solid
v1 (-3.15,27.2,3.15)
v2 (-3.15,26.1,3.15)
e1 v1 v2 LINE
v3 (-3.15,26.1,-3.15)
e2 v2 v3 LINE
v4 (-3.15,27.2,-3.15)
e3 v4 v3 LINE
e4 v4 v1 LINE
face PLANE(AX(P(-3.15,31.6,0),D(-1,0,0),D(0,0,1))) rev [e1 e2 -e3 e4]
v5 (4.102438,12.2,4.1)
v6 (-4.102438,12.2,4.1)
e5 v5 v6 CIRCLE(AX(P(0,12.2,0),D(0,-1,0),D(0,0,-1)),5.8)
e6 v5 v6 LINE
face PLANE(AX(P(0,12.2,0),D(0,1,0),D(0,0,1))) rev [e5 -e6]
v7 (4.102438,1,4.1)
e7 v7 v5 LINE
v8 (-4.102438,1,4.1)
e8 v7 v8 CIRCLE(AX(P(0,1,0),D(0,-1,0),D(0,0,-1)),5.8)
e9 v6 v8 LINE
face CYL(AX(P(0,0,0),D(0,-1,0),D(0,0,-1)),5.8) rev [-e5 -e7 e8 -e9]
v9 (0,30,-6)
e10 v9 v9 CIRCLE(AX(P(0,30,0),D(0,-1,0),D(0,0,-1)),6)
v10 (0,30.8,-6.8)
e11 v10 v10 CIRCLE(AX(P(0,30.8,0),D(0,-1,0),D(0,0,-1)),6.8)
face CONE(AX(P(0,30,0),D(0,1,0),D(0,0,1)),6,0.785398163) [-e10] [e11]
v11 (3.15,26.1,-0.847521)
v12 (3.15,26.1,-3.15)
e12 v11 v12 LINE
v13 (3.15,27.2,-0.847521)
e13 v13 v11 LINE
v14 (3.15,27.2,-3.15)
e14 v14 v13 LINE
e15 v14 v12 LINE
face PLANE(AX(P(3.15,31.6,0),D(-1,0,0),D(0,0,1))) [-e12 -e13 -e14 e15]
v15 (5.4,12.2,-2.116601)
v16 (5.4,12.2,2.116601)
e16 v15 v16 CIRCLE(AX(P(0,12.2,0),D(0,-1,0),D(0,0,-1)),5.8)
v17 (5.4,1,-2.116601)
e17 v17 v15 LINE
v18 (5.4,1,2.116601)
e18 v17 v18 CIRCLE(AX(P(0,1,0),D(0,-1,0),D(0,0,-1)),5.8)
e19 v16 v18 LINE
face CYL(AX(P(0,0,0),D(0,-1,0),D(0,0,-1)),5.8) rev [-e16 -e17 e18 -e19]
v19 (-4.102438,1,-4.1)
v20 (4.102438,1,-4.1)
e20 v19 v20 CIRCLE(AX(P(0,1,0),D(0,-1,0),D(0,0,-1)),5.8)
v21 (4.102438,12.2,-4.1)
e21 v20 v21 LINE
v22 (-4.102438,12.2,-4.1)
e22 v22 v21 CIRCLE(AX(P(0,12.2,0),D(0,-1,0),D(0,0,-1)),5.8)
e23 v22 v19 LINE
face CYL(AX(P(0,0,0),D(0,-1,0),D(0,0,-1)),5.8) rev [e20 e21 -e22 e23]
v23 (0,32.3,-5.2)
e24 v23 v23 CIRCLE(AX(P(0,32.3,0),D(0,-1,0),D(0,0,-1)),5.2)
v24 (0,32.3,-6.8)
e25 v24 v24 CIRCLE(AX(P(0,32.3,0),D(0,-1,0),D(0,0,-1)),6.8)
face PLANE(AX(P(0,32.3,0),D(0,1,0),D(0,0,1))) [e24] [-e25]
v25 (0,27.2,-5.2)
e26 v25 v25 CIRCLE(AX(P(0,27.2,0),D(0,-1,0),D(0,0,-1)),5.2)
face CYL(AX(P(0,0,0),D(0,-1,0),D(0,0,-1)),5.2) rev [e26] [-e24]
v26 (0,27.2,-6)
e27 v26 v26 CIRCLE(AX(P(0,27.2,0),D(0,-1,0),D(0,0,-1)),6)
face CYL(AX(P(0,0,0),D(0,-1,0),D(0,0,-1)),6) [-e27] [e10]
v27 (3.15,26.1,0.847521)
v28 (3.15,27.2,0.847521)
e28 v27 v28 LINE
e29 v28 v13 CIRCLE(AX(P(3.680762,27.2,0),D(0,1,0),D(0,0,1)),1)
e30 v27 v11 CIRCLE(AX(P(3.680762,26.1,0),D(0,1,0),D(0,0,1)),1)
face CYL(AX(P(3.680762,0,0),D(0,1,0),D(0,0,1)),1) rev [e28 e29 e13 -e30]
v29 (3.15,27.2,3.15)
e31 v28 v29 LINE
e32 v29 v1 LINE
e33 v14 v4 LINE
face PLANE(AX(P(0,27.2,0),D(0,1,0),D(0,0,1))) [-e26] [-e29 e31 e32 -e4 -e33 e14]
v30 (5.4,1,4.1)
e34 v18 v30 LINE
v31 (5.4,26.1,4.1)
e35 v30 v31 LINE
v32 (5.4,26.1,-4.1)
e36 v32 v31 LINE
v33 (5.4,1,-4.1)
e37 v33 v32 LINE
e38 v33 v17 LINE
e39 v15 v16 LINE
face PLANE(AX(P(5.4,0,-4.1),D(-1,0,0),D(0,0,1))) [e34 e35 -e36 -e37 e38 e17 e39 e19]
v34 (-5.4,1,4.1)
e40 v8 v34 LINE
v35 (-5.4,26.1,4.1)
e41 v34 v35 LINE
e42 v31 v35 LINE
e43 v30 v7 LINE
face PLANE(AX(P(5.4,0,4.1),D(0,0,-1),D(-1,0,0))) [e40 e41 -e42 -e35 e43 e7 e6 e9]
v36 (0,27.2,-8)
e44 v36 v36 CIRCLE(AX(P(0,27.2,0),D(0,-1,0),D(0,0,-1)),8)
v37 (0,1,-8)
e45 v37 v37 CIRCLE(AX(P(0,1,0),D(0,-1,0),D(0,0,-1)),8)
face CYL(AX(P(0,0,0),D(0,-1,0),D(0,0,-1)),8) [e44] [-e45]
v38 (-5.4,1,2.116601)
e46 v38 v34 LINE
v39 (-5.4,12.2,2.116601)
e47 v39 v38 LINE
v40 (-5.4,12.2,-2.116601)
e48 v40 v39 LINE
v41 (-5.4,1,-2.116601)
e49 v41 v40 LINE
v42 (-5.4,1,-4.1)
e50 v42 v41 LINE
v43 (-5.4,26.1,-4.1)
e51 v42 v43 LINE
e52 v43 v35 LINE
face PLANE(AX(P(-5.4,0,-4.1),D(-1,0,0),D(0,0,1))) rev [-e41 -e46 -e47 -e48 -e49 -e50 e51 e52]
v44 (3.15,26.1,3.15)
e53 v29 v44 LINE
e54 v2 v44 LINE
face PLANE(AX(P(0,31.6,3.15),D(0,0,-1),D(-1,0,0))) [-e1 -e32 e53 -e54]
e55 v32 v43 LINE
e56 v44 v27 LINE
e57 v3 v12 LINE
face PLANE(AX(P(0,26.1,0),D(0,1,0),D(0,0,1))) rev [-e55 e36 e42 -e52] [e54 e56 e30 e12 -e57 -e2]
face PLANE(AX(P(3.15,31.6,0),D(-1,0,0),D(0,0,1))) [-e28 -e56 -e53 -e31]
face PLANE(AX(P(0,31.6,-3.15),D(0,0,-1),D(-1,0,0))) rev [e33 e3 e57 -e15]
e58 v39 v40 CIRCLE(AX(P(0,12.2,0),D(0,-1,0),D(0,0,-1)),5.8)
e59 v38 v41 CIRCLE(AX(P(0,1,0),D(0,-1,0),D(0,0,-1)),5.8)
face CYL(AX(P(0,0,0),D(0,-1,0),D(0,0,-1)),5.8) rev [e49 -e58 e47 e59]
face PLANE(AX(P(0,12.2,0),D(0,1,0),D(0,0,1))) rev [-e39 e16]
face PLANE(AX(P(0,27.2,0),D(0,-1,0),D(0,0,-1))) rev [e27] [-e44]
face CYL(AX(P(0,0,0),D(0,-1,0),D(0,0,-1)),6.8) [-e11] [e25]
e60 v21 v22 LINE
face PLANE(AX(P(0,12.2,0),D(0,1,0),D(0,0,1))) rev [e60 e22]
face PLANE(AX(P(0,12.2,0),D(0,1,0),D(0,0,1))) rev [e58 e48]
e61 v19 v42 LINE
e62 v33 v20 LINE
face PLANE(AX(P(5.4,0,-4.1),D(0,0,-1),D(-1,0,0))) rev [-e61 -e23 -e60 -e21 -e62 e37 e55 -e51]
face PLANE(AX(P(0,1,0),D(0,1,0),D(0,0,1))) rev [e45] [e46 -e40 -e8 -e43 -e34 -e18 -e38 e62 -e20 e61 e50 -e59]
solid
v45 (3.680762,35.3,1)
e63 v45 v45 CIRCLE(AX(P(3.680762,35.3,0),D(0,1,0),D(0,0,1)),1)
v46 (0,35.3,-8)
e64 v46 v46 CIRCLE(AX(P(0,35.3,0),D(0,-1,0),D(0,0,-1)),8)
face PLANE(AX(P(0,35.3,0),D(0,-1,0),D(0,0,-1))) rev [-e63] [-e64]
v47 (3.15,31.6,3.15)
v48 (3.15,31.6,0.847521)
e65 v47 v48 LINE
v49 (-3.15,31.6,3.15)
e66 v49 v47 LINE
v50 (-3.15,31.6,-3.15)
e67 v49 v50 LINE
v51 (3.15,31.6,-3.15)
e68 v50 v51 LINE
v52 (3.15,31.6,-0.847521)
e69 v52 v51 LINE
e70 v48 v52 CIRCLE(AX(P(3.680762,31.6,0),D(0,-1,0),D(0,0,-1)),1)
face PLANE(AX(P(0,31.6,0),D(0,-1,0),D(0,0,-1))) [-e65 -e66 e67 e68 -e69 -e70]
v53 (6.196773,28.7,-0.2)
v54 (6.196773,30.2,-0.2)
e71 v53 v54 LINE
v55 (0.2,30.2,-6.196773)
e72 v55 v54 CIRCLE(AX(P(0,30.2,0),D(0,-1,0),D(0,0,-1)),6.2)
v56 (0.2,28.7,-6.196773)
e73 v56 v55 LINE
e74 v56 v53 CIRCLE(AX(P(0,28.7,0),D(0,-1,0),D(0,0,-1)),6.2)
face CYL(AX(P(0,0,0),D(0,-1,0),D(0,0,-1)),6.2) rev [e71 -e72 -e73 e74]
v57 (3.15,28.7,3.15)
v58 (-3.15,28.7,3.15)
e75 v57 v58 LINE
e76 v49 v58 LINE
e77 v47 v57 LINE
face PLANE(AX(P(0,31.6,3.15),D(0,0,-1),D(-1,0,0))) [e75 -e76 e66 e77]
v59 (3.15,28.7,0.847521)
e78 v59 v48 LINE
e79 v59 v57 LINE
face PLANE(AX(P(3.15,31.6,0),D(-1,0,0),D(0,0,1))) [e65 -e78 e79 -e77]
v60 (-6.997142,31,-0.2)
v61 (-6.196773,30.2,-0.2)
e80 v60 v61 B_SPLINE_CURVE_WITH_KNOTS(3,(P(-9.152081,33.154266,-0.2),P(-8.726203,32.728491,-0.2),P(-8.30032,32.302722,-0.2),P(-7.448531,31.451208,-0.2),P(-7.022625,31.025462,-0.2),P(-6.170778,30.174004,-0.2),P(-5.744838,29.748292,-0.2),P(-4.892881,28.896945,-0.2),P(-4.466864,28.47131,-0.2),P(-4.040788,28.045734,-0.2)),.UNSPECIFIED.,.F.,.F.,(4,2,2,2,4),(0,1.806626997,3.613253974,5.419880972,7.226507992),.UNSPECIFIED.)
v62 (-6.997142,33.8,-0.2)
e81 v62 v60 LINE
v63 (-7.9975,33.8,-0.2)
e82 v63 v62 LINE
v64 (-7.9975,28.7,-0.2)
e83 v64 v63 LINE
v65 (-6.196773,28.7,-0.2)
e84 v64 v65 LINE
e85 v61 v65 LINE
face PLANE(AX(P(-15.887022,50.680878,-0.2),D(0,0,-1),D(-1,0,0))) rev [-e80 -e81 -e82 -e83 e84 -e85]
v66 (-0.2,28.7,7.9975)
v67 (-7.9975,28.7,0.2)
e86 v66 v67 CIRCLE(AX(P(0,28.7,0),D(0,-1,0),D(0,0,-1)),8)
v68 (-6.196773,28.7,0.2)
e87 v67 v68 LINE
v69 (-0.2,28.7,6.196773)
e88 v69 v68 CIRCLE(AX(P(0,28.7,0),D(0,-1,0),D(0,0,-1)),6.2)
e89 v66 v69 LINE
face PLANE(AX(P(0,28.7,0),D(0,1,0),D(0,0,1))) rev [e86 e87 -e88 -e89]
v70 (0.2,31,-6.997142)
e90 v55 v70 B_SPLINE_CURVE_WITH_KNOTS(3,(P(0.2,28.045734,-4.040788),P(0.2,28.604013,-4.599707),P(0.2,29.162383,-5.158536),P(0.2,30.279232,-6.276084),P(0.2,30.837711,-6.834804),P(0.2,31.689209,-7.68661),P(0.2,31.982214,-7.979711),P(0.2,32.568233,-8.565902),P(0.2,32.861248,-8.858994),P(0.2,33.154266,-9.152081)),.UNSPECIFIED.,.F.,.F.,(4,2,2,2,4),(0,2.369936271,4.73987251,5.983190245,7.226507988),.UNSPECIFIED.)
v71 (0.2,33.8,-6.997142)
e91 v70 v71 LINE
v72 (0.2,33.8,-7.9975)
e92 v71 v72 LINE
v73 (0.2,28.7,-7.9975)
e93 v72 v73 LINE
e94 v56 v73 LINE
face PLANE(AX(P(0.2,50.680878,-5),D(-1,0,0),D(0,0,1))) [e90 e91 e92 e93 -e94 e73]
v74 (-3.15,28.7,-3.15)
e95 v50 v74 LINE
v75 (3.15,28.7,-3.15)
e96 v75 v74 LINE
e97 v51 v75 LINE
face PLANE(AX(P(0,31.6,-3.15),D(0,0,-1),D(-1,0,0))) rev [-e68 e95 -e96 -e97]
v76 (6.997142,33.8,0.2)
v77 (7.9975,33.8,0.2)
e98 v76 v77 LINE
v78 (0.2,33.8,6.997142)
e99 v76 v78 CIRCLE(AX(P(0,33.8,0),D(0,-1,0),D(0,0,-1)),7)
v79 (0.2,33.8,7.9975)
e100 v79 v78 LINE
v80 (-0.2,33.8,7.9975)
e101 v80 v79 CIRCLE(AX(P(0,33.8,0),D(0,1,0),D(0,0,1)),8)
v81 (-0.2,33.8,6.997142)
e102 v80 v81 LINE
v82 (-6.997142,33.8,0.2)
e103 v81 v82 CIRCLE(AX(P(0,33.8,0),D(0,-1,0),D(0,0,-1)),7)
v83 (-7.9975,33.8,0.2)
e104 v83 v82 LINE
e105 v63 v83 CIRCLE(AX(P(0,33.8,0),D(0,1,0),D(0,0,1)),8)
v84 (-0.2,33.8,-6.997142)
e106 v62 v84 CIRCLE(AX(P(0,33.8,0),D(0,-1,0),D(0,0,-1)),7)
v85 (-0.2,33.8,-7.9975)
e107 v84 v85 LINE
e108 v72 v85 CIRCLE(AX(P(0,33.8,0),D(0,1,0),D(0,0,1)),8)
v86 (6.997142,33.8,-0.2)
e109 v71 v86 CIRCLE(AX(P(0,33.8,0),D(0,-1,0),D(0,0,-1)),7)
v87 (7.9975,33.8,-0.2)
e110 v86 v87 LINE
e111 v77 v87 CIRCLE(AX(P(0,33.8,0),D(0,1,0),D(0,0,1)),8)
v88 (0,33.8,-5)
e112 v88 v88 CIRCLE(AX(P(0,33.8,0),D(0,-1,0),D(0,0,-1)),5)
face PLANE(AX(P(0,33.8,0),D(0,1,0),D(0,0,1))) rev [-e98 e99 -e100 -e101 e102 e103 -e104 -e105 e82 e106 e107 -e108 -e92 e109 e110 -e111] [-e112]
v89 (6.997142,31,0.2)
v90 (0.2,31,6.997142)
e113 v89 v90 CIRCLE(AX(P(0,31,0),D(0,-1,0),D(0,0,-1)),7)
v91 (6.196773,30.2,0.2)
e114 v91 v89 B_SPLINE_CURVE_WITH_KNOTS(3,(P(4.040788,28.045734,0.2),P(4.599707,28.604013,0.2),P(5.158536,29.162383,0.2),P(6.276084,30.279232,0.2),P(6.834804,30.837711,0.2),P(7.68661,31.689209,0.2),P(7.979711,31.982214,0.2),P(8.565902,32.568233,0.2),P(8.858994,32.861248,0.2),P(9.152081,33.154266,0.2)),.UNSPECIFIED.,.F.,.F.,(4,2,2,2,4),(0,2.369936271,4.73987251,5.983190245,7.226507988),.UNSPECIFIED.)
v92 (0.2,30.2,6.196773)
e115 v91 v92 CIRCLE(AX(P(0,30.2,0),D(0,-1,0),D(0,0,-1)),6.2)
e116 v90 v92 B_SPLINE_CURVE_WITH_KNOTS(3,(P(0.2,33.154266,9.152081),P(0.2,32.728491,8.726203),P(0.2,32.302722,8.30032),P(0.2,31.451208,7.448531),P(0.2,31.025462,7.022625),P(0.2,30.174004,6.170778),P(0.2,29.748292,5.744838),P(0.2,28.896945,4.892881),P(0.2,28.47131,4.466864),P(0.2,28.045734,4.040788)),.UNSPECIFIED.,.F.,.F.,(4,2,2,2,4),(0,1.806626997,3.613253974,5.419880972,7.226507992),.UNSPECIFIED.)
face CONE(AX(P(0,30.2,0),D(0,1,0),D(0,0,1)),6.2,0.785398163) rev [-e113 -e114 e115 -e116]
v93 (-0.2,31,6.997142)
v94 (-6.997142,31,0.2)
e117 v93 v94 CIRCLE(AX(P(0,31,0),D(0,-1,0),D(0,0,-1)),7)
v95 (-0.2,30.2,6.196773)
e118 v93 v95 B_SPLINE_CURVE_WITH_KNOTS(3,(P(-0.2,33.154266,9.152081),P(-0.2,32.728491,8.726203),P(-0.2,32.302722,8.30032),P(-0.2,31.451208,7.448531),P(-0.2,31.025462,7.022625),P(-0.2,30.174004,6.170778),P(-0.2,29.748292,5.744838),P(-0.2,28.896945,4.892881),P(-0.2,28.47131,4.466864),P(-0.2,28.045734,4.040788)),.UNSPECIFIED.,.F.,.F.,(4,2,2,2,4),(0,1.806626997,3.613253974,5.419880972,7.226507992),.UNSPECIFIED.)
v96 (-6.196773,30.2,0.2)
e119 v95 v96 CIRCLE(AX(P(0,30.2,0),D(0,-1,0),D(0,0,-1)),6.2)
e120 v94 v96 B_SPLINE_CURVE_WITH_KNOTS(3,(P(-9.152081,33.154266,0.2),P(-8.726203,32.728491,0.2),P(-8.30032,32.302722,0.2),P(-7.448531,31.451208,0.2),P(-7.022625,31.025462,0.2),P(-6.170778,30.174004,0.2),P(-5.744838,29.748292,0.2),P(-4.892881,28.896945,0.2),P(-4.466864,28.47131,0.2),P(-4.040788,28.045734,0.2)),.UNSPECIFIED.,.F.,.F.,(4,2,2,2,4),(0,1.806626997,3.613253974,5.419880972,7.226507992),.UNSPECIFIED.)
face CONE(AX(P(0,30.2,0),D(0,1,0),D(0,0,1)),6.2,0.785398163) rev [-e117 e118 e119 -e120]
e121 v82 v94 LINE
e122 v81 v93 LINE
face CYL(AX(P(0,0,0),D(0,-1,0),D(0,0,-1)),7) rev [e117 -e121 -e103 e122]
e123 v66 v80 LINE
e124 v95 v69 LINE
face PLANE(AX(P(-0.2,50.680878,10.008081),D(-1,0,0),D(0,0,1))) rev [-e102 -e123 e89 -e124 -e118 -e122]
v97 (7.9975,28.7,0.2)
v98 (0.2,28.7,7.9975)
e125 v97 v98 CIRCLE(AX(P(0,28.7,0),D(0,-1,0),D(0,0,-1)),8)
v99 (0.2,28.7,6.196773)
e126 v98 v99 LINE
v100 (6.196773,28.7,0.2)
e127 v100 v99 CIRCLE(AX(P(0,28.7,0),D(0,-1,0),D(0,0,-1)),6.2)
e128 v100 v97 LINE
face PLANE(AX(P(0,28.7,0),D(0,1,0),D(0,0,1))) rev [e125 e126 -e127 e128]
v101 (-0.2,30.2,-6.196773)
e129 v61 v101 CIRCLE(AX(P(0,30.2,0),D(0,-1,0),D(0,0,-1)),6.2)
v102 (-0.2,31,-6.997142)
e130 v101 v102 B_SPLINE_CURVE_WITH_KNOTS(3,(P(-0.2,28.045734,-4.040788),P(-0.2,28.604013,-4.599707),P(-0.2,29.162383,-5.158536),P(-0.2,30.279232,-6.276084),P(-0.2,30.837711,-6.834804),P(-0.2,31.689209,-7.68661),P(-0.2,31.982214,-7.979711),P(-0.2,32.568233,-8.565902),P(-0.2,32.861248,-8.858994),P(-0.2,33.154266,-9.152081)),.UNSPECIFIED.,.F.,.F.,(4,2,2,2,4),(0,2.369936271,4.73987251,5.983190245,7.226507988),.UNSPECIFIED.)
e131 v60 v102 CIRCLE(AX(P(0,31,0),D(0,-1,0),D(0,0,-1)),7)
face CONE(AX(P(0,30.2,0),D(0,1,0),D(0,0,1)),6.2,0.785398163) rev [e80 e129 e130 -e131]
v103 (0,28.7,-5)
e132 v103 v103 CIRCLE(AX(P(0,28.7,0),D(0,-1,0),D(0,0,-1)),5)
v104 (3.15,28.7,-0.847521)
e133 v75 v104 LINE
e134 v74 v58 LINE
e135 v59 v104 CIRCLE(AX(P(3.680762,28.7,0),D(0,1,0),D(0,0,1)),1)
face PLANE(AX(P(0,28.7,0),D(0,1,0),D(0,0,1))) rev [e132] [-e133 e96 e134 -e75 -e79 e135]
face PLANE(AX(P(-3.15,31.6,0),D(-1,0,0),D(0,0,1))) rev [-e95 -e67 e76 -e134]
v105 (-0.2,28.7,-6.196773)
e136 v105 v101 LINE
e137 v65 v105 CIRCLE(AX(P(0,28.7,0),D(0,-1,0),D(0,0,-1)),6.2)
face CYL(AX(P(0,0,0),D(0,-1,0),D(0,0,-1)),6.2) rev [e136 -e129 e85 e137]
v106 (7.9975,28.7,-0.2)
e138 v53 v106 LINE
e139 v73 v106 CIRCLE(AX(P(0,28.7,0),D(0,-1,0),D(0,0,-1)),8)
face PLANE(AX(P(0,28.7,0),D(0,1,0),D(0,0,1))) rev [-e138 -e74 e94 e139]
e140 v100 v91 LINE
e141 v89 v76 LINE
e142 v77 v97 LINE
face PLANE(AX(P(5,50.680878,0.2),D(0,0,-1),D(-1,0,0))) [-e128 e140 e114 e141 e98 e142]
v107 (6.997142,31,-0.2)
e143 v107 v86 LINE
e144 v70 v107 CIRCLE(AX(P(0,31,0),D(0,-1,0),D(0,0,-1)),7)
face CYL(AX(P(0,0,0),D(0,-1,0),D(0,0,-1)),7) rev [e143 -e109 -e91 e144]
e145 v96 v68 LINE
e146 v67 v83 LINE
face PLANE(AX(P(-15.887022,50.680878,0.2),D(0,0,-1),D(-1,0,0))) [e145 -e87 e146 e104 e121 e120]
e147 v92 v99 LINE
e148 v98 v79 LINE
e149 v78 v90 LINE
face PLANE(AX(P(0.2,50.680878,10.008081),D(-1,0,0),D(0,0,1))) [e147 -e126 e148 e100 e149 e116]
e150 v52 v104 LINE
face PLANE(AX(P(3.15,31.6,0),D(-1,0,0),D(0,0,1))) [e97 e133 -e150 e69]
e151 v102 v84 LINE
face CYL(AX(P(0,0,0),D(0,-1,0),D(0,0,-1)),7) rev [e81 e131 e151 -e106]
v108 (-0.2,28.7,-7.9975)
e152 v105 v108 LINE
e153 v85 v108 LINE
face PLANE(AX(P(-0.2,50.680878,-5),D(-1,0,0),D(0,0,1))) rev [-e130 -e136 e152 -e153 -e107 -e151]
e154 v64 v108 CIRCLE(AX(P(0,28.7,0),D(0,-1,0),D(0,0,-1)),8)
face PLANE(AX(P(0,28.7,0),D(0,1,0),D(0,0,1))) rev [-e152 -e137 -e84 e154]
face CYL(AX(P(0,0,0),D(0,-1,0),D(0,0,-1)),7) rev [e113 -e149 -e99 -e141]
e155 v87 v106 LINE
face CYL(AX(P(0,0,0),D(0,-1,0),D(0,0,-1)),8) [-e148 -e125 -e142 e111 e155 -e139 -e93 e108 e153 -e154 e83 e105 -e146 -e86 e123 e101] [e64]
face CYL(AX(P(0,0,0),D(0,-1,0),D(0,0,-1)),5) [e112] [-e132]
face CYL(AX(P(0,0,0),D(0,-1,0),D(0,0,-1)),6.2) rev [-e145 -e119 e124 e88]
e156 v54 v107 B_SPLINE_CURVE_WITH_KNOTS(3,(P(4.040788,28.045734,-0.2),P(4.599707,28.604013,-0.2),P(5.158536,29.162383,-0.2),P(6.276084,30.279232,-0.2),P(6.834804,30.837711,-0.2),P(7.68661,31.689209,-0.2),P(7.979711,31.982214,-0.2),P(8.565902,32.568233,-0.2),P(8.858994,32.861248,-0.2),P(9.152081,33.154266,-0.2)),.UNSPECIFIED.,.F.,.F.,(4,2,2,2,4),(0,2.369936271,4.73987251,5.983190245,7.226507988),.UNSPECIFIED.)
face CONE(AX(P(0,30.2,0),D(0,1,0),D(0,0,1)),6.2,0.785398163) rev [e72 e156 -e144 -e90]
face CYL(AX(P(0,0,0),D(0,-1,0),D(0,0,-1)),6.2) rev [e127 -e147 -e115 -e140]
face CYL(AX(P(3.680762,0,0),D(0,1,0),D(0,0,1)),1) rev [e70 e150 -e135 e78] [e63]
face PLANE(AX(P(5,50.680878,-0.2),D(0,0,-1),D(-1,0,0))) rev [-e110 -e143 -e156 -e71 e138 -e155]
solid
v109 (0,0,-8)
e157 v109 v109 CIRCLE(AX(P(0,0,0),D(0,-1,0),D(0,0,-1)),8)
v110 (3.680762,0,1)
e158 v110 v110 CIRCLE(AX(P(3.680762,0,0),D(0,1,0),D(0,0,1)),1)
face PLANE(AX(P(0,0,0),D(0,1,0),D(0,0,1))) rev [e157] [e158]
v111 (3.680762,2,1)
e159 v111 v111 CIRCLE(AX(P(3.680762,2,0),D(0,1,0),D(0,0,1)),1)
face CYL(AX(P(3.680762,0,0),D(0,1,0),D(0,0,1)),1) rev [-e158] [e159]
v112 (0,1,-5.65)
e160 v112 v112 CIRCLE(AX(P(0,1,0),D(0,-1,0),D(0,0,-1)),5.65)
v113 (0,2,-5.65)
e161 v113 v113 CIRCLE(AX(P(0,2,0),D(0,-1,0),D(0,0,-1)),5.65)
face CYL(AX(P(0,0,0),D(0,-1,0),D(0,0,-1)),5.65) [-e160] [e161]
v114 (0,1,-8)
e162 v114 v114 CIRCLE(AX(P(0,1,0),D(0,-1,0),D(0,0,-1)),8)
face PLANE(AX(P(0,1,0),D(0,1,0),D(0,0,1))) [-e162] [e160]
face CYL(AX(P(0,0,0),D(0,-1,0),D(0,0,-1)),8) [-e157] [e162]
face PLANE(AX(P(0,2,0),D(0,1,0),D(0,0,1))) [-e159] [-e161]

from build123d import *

# Parameters (mm, degrees)
CUT_EXTRUDE1_START      = -13.9
SKETCH2_W               = 10.8
SKETCH2_H               = 8.2
CUT_EXTRUDE1_DEPTH      = 40.621780654
CUT_EXTRUDE3_START      = -13.9
SKETCH2_3_W             = 6.3
SKETCH2_3_H             = 6.3
CUT_EXTRUDE3_DEPTH      = 5.5
SKETCH3_R               = 1
CUT_EXTRUDE4_DEPTH      = 38.068719967
CUT_EXTRUDE_THIN1_START = -5.1
SKETCH4_W               = 0.4
SKETCH4_H               = 5.00808145
SKETCH4_W_2             = 10.887021878
SKETCH4_H_2             = 0.4
SKETCH4_W_3             = 16.876138358
SKETCH4_H_3             = 7.865270954
CUT_EXTRUDE_THIN1_DEPTH = 33.8


# Read off the part's stored shape, not the designer's step: Revolve2
with BuildPart() as part:
    # Sketch1 → Revolve1 (revolve)
    with BuildSketch(Plane.XY, mode=Mode.PRIVATE) as revolve1_sk:
        Polygon((-5, 28.7), (0, 28.7), (0, 35.3), (-8, 35.3), (-8, 28.7), (-6.2, 28.7), (-6.2, 30.2), (-7, 31), (-7, 33.8), (-5, 33.8), align=None)
    revolve(revolve1_sk.sketch.rotate(Axis((0, 0, 0), (0, 1, 0)), 270), axis=Axis((0, 0, 0), (0, 1, 0)))


with BuildPart() as body_2:
    # Revolve2 outline → Revolve2 (revolve)
    with BuildSketch(Plane.XY):
        Polygon((8, 27.2), (6, 27.2), (6, 30), (6.8, 30.8), (6.8, 32.3), (5.2, 32.3), (5.2, 27.2), (0, 27.2), (0, 12.2), (5.8, 12.2), (5.8, 1), (8, 1), align=None)
    revolve(axis=Axis((0, 0, 0), (0, 1, 0)))

    # Sketch2 → Cut-Extrude1 (cut, through all)
    with BuildSketch(Plane.XZ.offset(-12.2).offset(CUT_EXTRUDE1_START)):
        Rectangle(SKETCH2_W, SKETCH2_H)
    extrude(amount=CUT_EXTRUDE1_DEPTH, mode=Mode.SUBTRACT)


with BuildPart() as body_3:
    # Sketch1<4> → Revolve3 (revolve)
    with BuildSketch(Plane.XY, mode=Mode.PRIVATE) as revolve3_sk:
        Polygon((-8, 1), (-5.65, 1), (-5.65, 2), (0, 2), (0, 0), (-8, 0), align=None)
    revolve(revolve3_sk.sketch.rotate(Axis((0, 0, 0), (0, 1, 0)), 270), axis=Axis((0, 0, 0), (0, 1, 0)))


with BuildPart() as cut_extrude3_tool:
    # Sketch2<3> → Cut-Extrude3 (new body)
    with BuildSketch(Plane.XZ.offset(-12.2).offset(CUT_EXTRUDE3_START)):
        Rectangle(SKETCH2_3_W, SKETCH2_3_H)
    extrude(amount=-CUT_EXTRUDE3_DEPTH)


with BuildPart() as part_1:
    add(part.part)

    # Cut-Extrude3: cut by cut_extrude3_tool
    add(cut_extrude3_tool.part, mode=Mode.SUBTRACT)


with BuildPart() as body_2_1:
    add(body_2.part)

    # Cut-Extrude3: cut by cut_extrude3_tool
    add(cut_extrude3_tool.part, mode=Mode.SUBTRACT)


with BuildPart() as cut_extrude4_tool:
    # Sketch3 → Cut-Extrude4 (new, through all)
    with BuildSketch(Plane(origin=(0, 35.3, 0), x_dir=(1, 0, 0), z_dir=(0, 1, 0))):
        with Locations(Location((3.68076211, 0, 0), (0, 0, 270))):
            Circle(SKETCH3_R)
    extrude(amount=-CUT_EXTRUDE4_DEPTH)


with BuildPart() as part_2:
    add(part_1.part)

    # Cut-Extrude4: cut by cut_extrude4_tool
    add(cut_extrude4_tool.part, mode=Mode.SUBTRACT)

    # Sketch4 → Cut-Extrude-Thin1 (cut)
    with BuildSketch(Plane.XZ.offset(-28.7).offset(CUT_EXTRUDE_THIN1_START)):
        with Locations((0, 7.504040725)):
            Rectangle(SKETCH4_W, SKETCH4_H)
        with Locations((-10.443510939, 0)):
            Rectangle(SKETCH4_W_2, SKETCH4_H_2)
        with Locations((13.438069179, 0)):
            Rectangle(SKETCH4_W_3, SKETCH4_H_2)
        with Locations((0, -8.932635477)):
            Rectangle(SKETCH4_W, SKETCH4_H_3)
    extrude(amount=CUT_EXTRUDE_THIN1_DEPTH, mode=Mode.SUBTRACT)


with BuildPart() as body_2_2:
    add(body_2_1.part)

    # Cut-Extrude4: cut by cut_extrude4_tool
    add(cut_extrude4_tool.part, mode=Mode.SUBTRACT)


with BuildPart() as body_3_1:
    add(body_3.part)

    # Cut-Extrude4: cut by cut_extrude4_tool
    add(cut_extrude4_tool.part, mode=Mode.SUBTRACT)


solid = Compound([part_2.part, body_2_2.part, body_3_1.part])
